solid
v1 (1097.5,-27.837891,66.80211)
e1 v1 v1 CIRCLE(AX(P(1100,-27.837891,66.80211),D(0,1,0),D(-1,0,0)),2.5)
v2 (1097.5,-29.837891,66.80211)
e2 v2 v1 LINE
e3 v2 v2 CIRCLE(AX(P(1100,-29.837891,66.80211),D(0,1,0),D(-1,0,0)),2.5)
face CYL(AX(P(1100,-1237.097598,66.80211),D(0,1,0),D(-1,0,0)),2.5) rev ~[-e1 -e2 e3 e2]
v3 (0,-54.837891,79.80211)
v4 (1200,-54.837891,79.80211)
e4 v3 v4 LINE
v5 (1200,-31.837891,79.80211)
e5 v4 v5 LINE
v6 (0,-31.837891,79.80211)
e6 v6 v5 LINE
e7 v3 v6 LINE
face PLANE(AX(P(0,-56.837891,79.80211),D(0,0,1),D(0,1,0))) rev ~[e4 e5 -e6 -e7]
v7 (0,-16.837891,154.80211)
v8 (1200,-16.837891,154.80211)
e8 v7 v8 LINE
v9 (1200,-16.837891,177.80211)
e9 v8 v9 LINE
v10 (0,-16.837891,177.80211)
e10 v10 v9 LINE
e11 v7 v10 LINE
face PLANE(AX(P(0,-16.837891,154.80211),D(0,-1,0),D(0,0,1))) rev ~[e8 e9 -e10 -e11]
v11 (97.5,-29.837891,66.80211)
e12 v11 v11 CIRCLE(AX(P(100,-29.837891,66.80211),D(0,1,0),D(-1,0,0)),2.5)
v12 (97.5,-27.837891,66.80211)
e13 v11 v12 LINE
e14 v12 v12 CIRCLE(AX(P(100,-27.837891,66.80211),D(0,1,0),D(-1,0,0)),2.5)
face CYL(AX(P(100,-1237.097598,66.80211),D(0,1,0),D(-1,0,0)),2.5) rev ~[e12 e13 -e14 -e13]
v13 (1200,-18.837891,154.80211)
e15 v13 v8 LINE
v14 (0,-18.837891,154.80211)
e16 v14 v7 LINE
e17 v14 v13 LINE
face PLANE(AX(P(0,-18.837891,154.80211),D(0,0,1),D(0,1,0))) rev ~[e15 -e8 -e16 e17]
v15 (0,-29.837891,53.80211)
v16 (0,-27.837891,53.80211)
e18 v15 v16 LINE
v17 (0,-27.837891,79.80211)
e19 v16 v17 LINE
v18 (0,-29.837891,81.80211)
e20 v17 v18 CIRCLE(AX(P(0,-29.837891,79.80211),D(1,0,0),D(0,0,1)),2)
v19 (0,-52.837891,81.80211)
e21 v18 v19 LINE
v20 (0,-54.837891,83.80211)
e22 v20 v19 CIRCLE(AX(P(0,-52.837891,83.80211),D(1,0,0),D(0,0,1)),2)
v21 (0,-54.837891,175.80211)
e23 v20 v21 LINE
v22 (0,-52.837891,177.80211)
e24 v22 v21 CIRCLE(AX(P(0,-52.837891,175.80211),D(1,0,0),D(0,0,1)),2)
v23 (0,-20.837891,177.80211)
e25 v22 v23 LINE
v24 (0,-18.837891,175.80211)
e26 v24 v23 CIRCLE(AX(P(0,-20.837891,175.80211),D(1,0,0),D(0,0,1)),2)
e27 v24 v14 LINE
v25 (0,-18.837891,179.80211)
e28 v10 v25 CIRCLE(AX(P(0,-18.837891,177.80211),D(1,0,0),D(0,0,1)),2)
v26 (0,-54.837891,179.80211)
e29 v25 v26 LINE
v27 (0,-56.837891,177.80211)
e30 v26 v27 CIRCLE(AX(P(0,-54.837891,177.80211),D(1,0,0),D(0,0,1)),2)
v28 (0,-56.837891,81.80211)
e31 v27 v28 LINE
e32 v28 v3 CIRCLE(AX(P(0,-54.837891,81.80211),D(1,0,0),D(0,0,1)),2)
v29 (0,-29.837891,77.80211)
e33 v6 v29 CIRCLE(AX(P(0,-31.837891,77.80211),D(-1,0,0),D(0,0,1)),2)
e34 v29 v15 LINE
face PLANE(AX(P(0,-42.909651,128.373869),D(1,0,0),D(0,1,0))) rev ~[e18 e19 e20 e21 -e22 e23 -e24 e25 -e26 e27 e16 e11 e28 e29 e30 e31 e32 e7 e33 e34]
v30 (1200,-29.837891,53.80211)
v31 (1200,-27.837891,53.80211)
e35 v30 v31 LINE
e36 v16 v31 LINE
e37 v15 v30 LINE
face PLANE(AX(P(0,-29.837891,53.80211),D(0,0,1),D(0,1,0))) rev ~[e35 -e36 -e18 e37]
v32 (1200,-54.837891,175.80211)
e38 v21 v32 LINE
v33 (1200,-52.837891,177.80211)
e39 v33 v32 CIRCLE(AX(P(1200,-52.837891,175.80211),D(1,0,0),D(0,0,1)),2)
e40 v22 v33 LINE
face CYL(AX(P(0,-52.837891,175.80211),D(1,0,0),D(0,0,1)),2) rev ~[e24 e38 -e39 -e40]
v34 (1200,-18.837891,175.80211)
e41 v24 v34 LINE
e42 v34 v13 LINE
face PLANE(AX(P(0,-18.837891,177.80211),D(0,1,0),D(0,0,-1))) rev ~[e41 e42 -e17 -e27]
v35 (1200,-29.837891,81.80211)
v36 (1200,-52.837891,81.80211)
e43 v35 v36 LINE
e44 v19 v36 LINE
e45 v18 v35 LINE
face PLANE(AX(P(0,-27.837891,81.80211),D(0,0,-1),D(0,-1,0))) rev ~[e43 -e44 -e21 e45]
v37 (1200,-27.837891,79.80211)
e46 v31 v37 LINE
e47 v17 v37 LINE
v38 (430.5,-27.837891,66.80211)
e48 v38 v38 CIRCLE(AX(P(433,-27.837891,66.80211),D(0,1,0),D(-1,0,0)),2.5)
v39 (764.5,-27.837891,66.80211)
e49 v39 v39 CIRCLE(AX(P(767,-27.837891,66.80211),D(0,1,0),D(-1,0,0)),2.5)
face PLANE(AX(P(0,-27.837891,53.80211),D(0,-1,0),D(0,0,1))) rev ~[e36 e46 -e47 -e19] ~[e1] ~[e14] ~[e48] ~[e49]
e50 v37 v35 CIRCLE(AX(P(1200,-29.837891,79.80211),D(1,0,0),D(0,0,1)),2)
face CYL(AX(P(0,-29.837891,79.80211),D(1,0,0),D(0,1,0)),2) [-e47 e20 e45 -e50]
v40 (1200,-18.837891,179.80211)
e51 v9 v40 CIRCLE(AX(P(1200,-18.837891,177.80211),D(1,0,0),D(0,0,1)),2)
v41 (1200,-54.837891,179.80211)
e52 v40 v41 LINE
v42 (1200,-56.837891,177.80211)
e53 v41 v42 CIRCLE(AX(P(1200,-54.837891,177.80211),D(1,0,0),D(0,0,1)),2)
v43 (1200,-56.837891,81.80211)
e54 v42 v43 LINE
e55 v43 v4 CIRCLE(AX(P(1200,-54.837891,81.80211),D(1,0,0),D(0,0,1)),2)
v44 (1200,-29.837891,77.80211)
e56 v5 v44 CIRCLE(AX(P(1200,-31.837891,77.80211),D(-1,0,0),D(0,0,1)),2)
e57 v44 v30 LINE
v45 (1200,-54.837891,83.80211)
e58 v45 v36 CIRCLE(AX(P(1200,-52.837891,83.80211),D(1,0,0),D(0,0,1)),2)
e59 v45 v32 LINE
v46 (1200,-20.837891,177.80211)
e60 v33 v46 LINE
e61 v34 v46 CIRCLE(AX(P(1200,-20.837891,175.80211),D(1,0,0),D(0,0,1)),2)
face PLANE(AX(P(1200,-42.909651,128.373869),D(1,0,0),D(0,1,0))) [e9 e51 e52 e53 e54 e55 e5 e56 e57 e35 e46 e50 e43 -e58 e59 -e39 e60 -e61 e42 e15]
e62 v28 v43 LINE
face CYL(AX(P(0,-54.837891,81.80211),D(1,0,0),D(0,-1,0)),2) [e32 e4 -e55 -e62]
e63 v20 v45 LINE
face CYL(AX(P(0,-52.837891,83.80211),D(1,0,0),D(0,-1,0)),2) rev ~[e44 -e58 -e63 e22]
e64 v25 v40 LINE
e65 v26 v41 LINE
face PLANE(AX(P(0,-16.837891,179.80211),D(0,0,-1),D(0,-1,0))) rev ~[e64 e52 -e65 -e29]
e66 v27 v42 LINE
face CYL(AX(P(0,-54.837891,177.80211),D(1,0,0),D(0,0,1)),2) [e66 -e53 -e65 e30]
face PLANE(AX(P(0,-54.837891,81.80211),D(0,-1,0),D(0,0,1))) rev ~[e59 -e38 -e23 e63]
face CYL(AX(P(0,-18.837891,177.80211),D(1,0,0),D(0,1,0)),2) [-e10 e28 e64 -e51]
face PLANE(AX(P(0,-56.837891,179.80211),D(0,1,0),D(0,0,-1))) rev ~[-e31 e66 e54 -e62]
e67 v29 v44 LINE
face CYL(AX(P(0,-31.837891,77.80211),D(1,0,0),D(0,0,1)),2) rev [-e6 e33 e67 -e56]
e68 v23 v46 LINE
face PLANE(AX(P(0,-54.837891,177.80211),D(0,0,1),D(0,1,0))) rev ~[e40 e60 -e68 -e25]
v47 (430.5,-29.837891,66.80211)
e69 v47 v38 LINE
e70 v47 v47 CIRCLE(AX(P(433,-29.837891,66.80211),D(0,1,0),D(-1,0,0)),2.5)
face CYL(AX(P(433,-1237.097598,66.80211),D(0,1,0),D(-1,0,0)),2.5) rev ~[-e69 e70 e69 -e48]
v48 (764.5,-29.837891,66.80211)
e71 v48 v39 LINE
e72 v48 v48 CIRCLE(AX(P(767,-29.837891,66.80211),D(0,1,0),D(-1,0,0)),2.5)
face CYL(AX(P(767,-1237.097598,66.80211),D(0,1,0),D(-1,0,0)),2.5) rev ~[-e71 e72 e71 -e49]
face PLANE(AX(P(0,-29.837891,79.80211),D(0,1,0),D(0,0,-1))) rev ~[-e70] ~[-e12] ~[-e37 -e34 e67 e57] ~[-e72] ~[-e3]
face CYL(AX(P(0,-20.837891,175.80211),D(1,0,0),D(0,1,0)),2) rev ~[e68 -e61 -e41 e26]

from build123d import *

# Parameters (mm, degrees)
F1_DEPTH = 1200
F3_D     = 5
F4_R     = 2


# Not quite as in the source:
# - a feature names something its author has since deleted; it is built from what else it names


with BuildPart() as f1:
    # F0 (on Right) → F1 (new body)
    with BuildSketch(Plane.YZ):
        Polygon((-18.8378913403, 177.8021101952), (-18.8378913403, 154.8021101952), (-16.8378913403, 154.8021101952), (-16.8378913403, 179.8021101952), (-56.8378913403, 179.8021101952), (-56.8378913403, 79.8021101952), (-29.8378913403, 79.8021101952), (-29.8378913403, 53.8021101952), (-27.8378913403, 53.8021101952), (-27.8378913403, 81.8021101952), (-54.8378913403, 81.8021101952), (-54.8378913403, 177.8021101952), align=None)
    extrude(amount=F1_DEPTH)

    # F3 (through all)
    with Locations(Plane.XZ.offset(29.8378913403)):
        with Locations((433, 66.8021101952), (767, 66.8021101952), (1100, 66.8021101952), (100, 66.8021101952)):
            Hole(F3_D / 2)

    # F4
    f4_edges = [f1.edges().sort_by_distance(p)[0] for p in [
        (600, -56.837891, 179.80211),
        (600, -16.837891, 179.80211),
        (600, -56.837891, 79.80211),
        (600, -27.837891, 81.80211),
        (600, -54.837891, 81.80211),
        (600, -29.837891, 79.80211),
        (600, -18.837891, 177.80211),
        (600, -54.837891, 177.80211),
    ]]
    fillet(f4_edges, radius=F4_R)


solid = f1.part
